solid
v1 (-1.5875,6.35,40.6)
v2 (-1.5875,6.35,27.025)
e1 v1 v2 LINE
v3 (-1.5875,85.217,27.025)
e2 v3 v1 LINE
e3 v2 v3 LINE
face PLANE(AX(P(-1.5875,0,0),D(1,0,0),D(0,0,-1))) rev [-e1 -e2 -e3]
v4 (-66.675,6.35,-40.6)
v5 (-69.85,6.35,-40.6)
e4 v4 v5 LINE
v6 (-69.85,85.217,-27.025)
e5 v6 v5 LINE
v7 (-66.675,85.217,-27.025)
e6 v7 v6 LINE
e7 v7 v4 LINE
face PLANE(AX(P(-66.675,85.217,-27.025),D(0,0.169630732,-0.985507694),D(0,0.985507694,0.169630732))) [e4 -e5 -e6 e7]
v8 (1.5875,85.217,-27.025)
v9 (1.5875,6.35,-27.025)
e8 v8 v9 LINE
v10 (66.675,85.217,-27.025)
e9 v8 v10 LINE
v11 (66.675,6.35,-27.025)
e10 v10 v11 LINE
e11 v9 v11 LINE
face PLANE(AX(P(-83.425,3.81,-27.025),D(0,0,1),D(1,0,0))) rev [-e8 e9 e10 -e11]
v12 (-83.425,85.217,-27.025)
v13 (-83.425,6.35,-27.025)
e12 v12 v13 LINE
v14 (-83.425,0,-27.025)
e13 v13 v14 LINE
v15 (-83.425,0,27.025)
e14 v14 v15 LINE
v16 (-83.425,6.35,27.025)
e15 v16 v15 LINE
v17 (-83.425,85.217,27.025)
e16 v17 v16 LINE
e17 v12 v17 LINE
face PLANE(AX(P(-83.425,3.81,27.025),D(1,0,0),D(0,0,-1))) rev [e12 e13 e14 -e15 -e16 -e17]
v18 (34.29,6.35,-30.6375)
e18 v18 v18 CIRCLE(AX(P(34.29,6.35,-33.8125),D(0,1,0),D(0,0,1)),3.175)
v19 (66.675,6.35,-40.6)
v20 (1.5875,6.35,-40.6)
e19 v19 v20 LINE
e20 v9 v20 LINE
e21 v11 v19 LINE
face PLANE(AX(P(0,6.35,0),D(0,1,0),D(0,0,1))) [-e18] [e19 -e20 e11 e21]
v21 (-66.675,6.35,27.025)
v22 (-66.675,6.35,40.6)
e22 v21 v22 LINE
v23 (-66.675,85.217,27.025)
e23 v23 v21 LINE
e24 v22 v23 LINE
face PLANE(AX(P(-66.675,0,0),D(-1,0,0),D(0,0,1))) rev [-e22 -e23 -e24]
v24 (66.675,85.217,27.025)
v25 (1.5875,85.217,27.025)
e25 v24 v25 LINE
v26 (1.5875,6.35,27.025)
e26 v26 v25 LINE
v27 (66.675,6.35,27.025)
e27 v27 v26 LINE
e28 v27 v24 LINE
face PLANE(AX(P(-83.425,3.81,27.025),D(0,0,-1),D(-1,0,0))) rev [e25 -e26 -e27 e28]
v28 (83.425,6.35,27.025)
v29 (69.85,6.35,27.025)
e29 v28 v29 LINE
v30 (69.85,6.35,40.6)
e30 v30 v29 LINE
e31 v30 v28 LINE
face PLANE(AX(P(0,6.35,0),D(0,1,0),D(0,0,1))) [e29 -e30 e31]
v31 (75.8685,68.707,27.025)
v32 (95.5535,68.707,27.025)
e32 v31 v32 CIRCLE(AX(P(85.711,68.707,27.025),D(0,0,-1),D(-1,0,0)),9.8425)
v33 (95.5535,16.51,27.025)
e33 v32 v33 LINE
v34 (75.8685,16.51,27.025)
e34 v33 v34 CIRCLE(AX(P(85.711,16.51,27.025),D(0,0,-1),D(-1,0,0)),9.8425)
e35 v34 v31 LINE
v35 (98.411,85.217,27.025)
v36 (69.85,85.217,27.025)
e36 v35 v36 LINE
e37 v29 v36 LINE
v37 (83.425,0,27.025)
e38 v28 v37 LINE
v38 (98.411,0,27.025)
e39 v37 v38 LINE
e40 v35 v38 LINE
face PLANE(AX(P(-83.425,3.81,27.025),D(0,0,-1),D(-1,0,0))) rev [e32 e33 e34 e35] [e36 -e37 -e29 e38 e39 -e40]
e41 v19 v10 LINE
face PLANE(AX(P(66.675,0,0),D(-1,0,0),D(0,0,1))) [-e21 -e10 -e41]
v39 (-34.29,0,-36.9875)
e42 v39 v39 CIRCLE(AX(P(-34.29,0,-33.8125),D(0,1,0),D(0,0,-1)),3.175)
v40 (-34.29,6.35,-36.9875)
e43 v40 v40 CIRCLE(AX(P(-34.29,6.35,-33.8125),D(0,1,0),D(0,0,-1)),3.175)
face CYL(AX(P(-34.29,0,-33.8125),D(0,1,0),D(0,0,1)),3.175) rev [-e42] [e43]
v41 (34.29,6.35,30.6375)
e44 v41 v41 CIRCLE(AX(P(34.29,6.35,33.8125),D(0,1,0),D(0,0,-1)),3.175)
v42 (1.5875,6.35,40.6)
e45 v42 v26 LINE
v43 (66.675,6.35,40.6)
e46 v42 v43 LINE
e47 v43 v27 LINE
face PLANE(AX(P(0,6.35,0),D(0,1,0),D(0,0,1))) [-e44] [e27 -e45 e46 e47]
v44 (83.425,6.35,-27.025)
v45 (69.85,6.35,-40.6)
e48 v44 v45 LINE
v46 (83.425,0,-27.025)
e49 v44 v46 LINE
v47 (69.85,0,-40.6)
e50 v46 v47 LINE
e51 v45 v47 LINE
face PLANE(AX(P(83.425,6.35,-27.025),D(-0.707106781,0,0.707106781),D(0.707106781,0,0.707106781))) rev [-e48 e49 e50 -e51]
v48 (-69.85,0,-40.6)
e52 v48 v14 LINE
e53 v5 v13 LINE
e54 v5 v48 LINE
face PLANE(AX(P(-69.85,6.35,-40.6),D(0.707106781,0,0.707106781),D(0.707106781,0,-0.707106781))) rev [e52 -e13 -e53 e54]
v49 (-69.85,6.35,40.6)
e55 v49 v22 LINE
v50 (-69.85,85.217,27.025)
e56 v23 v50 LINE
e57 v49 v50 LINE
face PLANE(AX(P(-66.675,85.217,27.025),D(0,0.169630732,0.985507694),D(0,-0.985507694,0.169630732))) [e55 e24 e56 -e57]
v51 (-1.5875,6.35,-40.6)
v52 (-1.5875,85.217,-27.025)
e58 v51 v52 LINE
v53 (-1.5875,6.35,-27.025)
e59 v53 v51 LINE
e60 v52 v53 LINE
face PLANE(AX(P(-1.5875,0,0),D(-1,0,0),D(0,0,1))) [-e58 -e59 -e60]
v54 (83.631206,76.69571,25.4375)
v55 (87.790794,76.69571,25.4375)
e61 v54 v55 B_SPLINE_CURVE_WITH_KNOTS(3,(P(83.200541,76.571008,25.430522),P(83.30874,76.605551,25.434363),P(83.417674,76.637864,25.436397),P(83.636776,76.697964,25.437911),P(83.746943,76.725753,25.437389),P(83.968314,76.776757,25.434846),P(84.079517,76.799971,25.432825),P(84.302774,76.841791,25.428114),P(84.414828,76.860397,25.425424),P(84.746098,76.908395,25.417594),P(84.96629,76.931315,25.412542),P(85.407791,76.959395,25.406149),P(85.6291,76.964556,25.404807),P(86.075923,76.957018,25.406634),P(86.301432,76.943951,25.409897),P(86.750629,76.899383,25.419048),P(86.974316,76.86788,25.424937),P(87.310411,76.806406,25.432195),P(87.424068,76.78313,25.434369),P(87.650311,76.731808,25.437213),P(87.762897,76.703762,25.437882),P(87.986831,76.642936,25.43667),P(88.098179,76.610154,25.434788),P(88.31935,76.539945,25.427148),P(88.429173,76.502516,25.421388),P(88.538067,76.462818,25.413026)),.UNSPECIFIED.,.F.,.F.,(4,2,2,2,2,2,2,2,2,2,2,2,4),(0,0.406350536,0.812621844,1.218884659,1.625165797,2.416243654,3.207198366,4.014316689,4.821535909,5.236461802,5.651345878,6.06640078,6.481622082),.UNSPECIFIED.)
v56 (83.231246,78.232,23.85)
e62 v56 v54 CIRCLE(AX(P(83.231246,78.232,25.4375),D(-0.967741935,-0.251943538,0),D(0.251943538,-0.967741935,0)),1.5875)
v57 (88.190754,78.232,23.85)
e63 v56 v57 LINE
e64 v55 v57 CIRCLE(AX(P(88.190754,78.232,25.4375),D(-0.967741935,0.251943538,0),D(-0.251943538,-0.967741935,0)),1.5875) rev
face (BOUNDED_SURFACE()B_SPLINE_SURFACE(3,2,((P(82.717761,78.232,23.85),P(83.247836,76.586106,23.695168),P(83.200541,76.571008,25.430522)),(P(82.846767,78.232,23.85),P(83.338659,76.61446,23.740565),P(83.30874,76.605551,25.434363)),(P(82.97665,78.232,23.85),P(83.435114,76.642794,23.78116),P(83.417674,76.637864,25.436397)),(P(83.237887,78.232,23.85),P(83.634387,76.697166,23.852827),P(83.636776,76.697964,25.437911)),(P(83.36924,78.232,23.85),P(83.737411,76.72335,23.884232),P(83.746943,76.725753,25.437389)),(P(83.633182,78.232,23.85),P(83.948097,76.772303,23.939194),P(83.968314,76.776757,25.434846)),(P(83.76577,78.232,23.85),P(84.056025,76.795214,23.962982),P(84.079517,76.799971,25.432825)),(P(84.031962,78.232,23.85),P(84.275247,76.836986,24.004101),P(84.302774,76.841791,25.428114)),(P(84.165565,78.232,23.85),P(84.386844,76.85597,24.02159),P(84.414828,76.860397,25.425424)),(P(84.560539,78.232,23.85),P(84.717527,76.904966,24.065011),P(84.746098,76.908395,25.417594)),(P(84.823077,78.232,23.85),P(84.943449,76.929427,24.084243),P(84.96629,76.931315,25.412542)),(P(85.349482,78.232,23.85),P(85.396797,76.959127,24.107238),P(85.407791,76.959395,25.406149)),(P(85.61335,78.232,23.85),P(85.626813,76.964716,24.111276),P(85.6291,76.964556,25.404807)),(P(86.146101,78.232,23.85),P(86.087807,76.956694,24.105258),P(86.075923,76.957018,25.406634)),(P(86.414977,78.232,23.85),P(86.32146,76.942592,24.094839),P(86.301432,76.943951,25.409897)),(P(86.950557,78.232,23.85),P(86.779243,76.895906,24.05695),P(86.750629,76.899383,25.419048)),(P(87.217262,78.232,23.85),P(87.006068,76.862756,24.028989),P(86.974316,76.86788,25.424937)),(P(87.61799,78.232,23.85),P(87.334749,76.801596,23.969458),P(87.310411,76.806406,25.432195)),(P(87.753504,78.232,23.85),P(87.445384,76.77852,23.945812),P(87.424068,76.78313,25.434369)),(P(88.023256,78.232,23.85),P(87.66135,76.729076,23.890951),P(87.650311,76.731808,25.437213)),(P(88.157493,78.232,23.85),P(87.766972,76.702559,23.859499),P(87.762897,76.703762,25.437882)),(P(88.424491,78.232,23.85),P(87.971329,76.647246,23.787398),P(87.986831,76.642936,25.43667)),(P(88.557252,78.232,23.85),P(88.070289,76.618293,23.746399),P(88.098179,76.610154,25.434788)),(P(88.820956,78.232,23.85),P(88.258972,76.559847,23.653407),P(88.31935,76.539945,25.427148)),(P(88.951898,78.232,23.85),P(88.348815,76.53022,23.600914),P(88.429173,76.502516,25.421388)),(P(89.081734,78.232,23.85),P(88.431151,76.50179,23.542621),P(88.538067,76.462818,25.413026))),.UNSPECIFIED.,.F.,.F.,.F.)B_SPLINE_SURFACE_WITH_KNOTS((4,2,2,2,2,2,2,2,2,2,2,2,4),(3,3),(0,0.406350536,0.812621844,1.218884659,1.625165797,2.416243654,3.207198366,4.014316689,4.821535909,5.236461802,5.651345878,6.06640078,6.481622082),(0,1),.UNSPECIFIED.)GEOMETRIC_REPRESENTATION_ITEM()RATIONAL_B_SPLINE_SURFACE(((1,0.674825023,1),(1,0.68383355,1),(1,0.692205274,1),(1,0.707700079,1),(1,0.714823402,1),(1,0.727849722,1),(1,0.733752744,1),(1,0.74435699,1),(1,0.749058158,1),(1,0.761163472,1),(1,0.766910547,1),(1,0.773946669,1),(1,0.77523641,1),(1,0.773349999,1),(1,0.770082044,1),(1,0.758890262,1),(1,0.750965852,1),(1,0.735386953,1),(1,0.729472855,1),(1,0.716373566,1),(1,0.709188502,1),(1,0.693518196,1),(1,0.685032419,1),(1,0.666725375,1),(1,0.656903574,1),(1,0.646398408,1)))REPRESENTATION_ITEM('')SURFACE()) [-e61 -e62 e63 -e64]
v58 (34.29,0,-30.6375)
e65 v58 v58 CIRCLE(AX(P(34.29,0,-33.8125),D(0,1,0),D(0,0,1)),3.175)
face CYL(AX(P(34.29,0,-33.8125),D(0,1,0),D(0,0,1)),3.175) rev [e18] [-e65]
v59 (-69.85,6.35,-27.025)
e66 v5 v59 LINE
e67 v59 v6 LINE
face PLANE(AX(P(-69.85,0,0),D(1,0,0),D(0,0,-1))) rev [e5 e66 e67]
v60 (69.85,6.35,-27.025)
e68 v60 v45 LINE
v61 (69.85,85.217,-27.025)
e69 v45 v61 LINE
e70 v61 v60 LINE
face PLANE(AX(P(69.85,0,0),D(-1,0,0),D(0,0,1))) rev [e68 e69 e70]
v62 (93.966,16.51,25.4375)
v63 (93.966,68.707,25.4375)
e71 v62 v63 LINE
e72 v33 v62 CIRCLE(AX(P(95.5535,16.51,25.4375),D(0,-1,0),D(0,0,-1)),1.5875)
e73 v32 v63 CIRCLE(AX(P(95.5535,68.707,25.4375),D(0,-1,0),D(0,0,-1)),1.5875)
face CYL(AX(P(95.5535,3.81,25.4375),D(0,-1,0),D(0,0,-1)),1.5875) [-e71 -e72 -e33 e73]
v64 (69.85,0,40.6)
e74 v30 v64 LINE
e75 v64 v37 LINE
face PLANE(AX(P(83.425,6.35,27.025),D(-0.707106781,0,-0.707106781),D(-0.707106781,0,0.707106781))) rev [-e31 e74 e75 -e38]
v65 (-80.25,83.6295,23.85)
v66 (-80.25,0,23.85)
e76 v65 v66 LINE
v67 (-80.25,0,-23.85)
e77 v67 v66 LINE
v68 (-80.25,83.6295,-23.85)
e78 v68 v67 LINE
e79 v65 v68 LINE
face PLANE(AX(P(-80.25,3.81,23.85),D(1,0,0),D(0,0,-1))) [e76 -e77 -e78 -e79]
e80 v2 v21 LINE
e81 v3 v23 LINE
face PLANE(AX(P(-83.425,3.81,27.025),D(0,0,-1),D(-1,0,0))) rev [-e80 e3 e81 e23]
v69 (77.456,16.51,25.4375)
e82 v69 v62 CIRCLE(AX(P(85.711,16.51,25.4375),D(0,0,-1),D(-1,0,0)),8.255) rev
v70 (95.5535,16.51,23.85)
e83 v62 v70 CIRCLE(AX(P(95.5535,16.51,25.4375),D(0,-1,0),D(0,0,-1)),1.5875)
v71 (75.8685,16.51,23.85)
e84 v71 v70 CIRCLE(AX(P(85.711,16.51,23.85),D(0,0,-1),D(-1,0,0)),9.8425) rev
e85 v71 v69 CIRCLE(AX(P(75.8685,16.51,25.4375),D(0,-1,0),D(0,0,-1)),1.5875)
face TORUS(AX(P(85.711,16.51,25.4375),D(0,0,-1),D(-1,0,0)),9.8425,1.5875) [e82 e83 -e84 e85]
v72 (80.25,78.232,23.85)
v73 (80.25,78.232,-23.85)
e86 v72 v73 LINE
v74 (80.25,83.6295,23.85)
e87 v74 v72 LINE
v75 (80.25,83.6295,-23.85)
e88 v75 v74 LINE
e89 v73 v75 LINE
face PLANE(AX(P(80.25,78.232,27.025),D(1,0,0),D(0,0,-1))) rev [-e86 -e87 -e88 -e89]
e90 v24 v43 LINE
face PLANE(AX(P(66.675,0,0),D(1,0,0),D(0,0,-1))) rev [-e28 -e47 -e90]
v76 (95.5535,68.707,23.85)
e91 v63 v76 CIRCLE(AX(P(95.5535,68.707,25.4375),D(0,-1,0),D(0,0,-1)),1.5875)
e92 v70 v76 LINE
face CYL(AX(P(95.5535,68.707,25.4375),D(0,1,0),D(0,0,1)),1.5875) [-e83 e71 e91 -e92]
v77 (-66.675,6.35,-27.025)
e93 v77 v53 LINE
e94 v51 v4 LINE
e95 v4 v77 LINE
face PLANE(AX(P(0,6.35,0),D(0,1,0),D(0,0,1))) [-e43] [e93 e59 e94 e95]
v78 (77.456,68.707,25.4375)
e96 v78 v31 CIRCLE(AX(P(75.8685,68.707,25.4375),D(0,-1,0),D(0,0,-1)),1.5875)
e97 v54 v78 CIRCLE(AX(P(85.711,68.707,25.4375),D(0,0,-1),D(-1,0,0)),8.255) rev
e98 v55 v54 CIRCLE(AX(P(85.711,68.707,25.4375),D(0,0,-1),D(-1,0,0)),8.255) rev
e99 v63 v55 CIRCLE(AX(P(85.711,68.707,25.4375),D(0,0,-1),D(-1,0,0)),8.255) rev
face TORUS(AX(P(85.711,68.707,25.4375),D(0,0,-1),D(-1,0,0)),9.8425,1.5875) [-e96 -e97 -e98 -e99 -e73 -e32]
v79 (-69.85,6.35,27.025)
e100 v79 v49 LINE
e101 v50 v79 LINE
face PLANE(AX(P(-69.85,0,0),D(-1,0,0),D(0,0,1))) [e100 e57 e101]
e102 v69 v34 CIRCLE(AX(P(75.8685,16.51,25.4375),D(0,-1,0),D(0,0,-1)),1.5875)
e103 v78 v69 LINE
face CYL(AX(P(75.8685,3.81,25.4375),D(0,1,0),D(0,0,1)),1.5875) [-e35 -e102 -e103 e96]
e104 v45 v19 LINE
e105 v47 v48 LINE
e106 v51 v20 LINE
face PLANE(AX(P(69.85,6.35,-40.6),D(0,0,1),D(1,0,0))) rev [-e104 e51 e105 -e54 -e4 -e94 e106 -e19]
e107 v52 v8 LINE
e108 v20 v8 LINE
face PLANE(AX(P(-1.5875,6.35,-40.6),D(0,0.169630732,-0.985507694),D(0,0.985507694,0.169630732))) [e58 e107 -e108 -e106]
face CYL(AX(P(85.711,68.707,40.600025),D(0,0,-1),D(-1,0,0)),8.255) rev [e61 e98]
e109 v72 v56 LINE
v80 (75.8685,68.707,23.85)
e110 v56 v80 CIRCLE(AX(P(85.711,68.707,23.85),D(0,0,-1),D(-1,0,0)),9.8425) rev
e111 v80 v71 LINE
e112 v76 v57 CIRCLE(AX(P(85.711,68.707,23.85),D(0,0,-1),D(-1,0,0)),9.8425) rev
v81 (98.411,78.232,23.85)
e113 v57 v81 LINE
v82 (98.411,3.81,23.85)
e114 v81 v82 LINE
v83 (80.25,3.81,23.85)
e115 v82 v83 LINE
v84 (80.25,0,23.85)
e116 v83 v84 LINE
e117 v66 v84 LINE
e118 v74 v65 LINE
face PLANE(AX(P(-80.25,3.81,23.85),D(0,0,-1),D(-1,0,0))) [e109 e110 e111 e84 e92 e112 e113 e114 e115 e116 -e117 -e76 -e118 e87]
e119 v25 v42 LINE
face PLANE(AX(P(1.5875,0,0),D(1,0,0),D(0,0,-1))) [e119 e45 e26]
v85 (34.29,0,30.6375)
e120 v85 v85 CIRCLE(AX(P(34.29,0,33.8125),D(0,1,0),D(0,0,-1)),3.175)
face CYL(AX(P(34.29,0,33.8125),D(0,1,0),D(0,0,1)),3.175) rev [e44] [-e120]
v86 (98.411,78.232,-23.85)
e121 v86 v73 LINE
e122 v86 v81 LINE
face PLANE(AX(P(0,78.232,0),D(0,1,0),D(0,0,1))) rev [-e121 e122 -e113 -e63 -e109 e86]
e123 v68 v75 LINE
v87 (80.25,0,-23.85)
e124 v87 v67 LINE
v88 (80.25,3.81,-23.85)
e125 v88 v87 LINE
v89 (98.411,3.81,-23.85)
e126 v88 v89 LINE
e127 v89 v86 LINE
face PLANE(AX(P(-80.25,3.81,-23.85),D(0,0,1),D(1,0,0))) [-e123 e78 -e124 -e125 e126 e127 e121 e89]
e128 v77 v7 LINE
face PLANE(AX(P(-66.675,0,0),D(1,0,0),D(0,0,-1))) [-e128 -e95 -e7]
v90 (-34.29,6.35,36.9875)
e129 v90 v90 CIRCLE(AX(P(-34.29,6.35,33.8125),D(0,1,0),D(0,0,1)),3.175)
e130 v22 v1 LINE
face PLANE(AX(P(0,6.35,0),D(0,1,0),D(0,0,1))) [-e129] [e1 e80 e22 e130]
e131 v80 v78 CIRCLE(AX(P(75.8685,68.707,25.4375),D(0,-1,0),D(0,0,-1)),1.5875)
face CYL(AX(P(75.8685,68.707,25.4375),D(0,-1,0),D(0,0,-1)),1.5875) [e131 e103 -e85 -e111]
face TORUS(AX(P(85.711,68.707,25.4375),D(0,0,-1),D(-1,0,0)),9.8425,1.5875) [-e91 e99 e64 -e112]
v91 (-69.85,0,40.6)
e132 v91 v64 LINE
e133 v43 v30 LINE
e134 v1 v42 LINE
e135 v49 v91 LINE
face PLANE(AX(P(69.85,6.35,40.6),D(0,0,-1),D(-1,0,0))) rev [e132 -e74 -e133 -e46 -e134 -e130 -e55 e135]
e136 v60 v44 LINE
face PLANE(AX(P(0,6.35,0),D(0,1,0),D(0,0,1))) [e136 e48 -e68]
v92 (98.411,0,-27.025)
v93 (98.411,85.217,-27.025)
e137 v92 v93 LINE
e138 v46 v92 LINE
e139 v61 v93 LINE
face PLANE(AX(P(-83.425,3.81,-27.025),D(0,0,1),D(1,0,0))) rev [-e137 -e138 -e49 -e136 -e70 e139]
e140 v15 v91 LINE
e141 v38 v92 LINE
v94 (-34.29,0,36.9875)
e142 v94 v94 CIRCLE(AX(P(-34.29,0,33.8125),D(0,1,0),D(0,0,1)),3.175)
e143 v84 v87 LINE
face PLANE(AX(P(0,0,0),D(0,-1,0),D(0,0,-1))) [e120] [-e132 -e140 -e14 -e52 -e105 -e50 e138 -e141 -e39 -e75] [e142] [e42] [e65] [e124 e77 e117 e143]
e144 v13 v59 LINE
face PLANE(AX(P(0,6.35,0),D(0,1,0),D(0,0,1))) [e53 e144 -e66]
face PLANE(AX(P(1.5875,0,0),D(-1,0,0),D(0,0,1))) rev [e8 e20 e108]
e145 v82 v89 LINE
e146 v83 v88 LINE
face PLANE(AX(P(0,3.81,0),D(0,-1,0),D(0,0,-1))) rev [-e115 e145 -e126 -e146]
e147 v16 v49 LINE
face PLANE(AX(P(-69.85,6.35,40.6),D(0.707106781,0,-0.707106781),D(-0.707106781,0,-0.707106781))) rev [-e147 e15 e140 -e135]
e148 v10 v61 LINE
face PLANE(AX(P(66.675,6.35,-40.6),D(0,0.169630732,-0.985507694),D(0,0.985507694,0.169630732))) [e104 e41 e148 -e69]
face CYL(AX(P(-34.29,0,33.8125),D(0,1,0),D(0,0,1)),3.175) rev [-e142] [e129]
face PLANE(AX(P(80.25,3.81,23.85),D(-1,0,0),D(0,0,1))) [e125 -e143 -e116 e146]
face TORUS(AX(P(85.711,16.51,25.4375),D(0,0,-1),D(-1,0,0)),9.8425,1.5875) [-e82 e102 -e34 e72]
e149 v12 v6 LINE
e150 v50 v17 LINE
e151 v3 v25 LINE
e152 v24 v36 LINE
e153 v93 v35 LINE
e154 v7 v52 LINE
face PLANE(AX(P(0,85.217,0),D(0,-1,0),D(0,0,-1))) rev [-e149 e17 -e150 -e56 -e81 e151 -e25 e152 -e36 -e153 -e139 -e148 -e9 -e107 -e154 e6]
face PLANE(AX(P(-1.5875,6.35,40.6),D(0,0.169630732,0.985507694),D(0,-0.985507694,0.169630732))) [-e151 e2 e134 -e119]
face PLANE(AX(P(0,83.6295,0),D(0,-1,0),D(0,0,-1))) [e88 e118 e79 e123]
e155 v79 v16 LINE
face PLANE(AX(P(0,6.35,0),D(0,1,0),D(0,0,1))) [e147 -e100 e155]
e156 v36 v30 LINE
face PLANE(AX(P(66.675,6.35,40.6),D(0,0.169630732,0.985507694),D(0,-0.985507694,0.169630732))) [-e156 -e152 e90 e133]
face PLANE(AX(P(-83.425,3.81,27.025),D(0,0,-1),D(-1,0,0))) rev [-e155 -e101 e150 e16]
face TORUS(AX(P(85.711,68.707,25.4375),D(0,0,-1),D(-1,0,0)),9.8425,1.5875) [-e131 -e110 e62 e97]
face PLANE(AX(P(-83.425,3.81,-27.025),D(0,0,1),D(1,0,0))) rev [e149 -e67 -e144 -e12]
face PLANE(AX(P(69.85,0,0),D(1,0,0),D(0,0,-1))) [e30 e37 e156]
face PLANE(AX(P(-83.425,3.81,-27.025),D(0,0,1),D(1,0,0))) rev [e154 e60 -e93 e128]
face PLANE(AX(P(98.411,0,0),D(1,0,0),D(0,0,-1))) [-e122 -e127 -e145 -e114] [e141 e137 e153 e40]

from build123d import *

# Parameters (mm, degrees)
SKETCH1_W                 = 166.85
SKETCH1_H                 = 54.05
SKETCH1_W_2               = 160.5
SKETCH1_H_2               = 47.7
BOSS_EXTRUDE1_DEPTH       = 3.81
BOSS_EXTRUDE2_DEPTH       = 78.232
SKETCH3_W                 = 166.85
SKETCH3_H                 = 54.05
BOSS_EXTRUDE5_DEPTH       = 3.175
SKETCH4_W                 = 3.175
SKETCH4_H                 = 54.05
BOSS_EXTRUDE6_DEPTH       = 3.81
BOSS_EXTRUDE7_DEPTH       = 6.35
BOSS_EXTRUDE9_DEPTH       = 3.175
BOSS_EXTRUDE10_DEPTH      = 3.175
SKETCH8_R                 = 3.175
CUT_EXTRUDE1_DEPTH        = 122.77066278
BOSS_EXTRUDE11_DEPTH      = 1.5875
BOSS_EXTRUDE11_DEPTH_BACK = 1.5875
SKETCH14_W                = 54.05
SKETCH14_H                = 85.217
SKETCH14_W_2              = 47.7
SKETCH14_H_2              = 74.422
BOSS_EXTRUDE13_DEPTH      = 14.986
CUT_EXTRUDE2_DEPTH        = 147.696293869
SKETCH16_W                = 160.5
SKETCH16_H                = 47.7
CUT_EXTRUDE3_DEPTH        = 1.5875
SKETCH17_W                = 18.712657602
SKETCH17_H                = 69.277031054
BOSS_EXTRUDE14_DEPTH      = 3.175
FILLET1_R                 = 1.5875


with BuildPart() as part:
    # Sketch1 → Boss-Extrude1 (new body)
    with BuildSketch(Plane(origin=(0, 0, 0), x_dir=(1, 0, 0), z_dir=(0, 1, 0))):
        Rectangle(SKETCH1_W, SKETCH1_H)
        Rectangle(SKETCH1_W_2, SKETCH1_H_2, mode=Mode.SUBTRACT)
    extrude(amount=BOSS_EXTRUDE1_DEPTH)

    # Sketch2 → Boss-Extrude2 (add)
    with BuildSketch(Plane(origin=(0, 3.81, 0), x_dir=(1, 0, 0), z_dir=(0, 1, 0))):
        Polygon((-83.425, 27.025), (83.425, 27.025), (83.425, 23.85), (80.25, 23.85), (-80.25, 23.85), (-80.25, -23.85), (80.25, -23.85), (83.425, -23.85), (83.425, -27.025), (-83.425, -27.025), align=None)
    extrude(amount=BOSS_EXTRUDE2_DEPTH)

    # Sketch3 → Boss-Extrude5 (add)
    with BuildSketch(Plane(origin=(0, 82.042, 0), x_dir=(1, 0, 0), z_dir=(0, 1, 0))):
        Rectangle(SKETCH3_W, SKETCH3_H)
    extrude(amount=BOSS_EXTRUDE5_DEPTH)

    # Sketch4 → Boss-Extrude6 (add)
    with BuildSketch(Plane.XZ.offset(-82.042)):
        with Locations((81.8375, 0)):
            Rectangle(SKETCH4_W, SKETCH4_H)
    extrude(amount=BOSS_EXTRUDE6_DEPTH)

    # Sketch5 → Boss-Extrude7 (add)
    with BuildSketch(Plane(origin=(0, 0, 0), x_dir=(1, 0, 0), z_dir=(0, 1, 0))):
        Polygon((-83.425, -27.025), (83.425, -27.025), (69.85, -40.6), (-69.85, -40.6), align=None)
        Polygon((-69.85, 40.6), (-83.425, 27.025), (83.425, 27.025), (69.85, 40.6), align=None)
    extrude(amount=BOSS_EXTRUDE7_DEPTH)

    # Sketch6 → Boss-Extrude9 (add)
    with BuildSketch(Plane.ZY.offset(69.85)):
        Polygon((27.025, 85.217), (27.025, 6.35), (40.6, 6.35), align=None)
        Polygon((-27.025, 85.217), (-40.6, 6.35), (-27.025, 6.35), align=None)
    extrude(amount=-BOSS_EXTRUDE9_DEPTH)

    # Sketch7 → Boss-Extrude10 (add)
    with BuildSketch(Plane(origin=(69.85, 0, 0), x_dir=(0, 0, -1), z_dir=(1, 0, 0))):
        Polygon((-27.025, 85.217), (-27.025, 6.35), (-40.6, 6.35), align=None)
        Polygon((40.6, 6.35), (27.025, 85.217), (27.025, 6.35), align=None)
    extrude(amount=-BOSS_EXTRUDE10_DEPTH)

    # Sketch8 → Cut-Extrude1 (cut, through all)
    with BuildSketch(Plane(origin=(0, 6.35, 0), x_dir=(1, 0, 0), z_dir=(0, 1, 0))):
        with Locations(Location((-34.29, -33.812500014, 0), (0, 0, 270))):
            Circle(SKETCH8_R)
        with Locations(Location((34.29, -33.812500014, 0), (0, 0, 90))):
            Circle(SKETCH8_R)
        with Locations(Location((34.29, 33.812500014, 0), (0, 0, 270))):
            Circle(SKETCH8_R)
        with Locations(Location((-34.29, 33.812500014, 0), (0, 0, 90))):
            Circle(SKETCH8_R)
    extrude(amount=-CUT_EXTRUDE1_DEPTH, mode=Mode.SUBTRACT)

    # Sketch11 → Boss-Extrude11 (add, two sides: drawn at the far end of the back side and taken through both)
    with BuildSketch(Plane(origin=(0, 0, 0), x_dir=(0, 0, -1), z_dir=(1, 0, 0)).offset(-BOSS_EXTRUDE11_DEPTH_BACK)):
        Polygon((-27.025, 85.217), (-27.025, 6.35), (-40.6, 6.35), align=None)
        Polygon((40.6, 6.35), (27.025, 85.217), (27.025, 6.35), align=None)
    extrude(amount=BOSS_EXTRUDE11_DEPTH + BOSS_EXTRUDE11_DEPTH_BACK)

    # Sketch14 → Boss-Extrude13 (add)
    with BuildSketch(Plane(origin=(98.411, 0, 0), x_dir=(0, 0, -1), z_dir=(1, 0, 0))):
        with Locations((0, 42.6085)):
            Rectangle(SKETCH14_W, SKETCH14_H)
        with Locations((0, 41.021)):
            Rectangle(SKETCH14_W_2, SKETCH14_H_2, mode=Mode.SUBTRACT)
    extrude(amount=-BOSS_EXTRUDE13_DEPTH)

    # Sketch15 → Cut-Extrude2 (cut, through all)
    with BuildSketch(Plane(origin=(0, 0, -27.025), x_dir=(-1, 0, 0), z_dir=(0, 0, -1))):
        with BuildLine():
            Line((-93.966, 68.707), (-93.966, 16.51))
            ThreePointArc((-93.966, 16.51), (-85.711, 8.255), (-77.456, 16.51))
            Line((-77.456, 16.51), (-77.456, 68.707))
            ThreePointArc((-77.456, 68.707), (-85.711, 76.962), (-93.966, 68.707))
        make_face()
    extrude(amount=-CUT_EXTRUDE2_DEPTH, mode=Mode.SUBTRACT)

    # Sketch16 → Cut-Extrude3 (cut)
    with BuildSketch(Plane.XZ.offset(-82.042)):
        Rectangle(SKETCH16_W, SKETCH16_H)
    extrude(amount=-CUT_EXTRUDE3_DEPTH, mode=Mode.SUBTRACT)

    # Sketch17 → Boss-Extrude14 (add)
    with BuildSketch(Plane(origin=(0, 0, -27.025), x_dir=(-1, 0, 0), z_dir=(0, 0, -1))):
        with Locations((-85.711, 42.6085)):
            Rectangle(SKETCH17_W, SKETCH17_H)
    extrude(amount=-BOSS_EXTRUDE14_DEPTH)

    # Fillet1
    fillet1_edges = [part.edges().sort_by_distance(p)[0] for p in [
        (85.711, 8.255, 23.85),
        (93.966, 42.6085, 23.85),
        (85.711, 76.962, 23.85),
        (85.711, 76.962, 27.025),
        (77.456, 42.6085, 27.025),
        (85.711, 8.255, 27.025),
        (77.456, 42.6085, 23.85),
        (93.966, 42.6085, 27.025),
    ]]
    fillet(fillet1_edges, radius=FILLET1_R - 0.0001)  # a hair under: the kernel refuses the full size


solid = part.part
